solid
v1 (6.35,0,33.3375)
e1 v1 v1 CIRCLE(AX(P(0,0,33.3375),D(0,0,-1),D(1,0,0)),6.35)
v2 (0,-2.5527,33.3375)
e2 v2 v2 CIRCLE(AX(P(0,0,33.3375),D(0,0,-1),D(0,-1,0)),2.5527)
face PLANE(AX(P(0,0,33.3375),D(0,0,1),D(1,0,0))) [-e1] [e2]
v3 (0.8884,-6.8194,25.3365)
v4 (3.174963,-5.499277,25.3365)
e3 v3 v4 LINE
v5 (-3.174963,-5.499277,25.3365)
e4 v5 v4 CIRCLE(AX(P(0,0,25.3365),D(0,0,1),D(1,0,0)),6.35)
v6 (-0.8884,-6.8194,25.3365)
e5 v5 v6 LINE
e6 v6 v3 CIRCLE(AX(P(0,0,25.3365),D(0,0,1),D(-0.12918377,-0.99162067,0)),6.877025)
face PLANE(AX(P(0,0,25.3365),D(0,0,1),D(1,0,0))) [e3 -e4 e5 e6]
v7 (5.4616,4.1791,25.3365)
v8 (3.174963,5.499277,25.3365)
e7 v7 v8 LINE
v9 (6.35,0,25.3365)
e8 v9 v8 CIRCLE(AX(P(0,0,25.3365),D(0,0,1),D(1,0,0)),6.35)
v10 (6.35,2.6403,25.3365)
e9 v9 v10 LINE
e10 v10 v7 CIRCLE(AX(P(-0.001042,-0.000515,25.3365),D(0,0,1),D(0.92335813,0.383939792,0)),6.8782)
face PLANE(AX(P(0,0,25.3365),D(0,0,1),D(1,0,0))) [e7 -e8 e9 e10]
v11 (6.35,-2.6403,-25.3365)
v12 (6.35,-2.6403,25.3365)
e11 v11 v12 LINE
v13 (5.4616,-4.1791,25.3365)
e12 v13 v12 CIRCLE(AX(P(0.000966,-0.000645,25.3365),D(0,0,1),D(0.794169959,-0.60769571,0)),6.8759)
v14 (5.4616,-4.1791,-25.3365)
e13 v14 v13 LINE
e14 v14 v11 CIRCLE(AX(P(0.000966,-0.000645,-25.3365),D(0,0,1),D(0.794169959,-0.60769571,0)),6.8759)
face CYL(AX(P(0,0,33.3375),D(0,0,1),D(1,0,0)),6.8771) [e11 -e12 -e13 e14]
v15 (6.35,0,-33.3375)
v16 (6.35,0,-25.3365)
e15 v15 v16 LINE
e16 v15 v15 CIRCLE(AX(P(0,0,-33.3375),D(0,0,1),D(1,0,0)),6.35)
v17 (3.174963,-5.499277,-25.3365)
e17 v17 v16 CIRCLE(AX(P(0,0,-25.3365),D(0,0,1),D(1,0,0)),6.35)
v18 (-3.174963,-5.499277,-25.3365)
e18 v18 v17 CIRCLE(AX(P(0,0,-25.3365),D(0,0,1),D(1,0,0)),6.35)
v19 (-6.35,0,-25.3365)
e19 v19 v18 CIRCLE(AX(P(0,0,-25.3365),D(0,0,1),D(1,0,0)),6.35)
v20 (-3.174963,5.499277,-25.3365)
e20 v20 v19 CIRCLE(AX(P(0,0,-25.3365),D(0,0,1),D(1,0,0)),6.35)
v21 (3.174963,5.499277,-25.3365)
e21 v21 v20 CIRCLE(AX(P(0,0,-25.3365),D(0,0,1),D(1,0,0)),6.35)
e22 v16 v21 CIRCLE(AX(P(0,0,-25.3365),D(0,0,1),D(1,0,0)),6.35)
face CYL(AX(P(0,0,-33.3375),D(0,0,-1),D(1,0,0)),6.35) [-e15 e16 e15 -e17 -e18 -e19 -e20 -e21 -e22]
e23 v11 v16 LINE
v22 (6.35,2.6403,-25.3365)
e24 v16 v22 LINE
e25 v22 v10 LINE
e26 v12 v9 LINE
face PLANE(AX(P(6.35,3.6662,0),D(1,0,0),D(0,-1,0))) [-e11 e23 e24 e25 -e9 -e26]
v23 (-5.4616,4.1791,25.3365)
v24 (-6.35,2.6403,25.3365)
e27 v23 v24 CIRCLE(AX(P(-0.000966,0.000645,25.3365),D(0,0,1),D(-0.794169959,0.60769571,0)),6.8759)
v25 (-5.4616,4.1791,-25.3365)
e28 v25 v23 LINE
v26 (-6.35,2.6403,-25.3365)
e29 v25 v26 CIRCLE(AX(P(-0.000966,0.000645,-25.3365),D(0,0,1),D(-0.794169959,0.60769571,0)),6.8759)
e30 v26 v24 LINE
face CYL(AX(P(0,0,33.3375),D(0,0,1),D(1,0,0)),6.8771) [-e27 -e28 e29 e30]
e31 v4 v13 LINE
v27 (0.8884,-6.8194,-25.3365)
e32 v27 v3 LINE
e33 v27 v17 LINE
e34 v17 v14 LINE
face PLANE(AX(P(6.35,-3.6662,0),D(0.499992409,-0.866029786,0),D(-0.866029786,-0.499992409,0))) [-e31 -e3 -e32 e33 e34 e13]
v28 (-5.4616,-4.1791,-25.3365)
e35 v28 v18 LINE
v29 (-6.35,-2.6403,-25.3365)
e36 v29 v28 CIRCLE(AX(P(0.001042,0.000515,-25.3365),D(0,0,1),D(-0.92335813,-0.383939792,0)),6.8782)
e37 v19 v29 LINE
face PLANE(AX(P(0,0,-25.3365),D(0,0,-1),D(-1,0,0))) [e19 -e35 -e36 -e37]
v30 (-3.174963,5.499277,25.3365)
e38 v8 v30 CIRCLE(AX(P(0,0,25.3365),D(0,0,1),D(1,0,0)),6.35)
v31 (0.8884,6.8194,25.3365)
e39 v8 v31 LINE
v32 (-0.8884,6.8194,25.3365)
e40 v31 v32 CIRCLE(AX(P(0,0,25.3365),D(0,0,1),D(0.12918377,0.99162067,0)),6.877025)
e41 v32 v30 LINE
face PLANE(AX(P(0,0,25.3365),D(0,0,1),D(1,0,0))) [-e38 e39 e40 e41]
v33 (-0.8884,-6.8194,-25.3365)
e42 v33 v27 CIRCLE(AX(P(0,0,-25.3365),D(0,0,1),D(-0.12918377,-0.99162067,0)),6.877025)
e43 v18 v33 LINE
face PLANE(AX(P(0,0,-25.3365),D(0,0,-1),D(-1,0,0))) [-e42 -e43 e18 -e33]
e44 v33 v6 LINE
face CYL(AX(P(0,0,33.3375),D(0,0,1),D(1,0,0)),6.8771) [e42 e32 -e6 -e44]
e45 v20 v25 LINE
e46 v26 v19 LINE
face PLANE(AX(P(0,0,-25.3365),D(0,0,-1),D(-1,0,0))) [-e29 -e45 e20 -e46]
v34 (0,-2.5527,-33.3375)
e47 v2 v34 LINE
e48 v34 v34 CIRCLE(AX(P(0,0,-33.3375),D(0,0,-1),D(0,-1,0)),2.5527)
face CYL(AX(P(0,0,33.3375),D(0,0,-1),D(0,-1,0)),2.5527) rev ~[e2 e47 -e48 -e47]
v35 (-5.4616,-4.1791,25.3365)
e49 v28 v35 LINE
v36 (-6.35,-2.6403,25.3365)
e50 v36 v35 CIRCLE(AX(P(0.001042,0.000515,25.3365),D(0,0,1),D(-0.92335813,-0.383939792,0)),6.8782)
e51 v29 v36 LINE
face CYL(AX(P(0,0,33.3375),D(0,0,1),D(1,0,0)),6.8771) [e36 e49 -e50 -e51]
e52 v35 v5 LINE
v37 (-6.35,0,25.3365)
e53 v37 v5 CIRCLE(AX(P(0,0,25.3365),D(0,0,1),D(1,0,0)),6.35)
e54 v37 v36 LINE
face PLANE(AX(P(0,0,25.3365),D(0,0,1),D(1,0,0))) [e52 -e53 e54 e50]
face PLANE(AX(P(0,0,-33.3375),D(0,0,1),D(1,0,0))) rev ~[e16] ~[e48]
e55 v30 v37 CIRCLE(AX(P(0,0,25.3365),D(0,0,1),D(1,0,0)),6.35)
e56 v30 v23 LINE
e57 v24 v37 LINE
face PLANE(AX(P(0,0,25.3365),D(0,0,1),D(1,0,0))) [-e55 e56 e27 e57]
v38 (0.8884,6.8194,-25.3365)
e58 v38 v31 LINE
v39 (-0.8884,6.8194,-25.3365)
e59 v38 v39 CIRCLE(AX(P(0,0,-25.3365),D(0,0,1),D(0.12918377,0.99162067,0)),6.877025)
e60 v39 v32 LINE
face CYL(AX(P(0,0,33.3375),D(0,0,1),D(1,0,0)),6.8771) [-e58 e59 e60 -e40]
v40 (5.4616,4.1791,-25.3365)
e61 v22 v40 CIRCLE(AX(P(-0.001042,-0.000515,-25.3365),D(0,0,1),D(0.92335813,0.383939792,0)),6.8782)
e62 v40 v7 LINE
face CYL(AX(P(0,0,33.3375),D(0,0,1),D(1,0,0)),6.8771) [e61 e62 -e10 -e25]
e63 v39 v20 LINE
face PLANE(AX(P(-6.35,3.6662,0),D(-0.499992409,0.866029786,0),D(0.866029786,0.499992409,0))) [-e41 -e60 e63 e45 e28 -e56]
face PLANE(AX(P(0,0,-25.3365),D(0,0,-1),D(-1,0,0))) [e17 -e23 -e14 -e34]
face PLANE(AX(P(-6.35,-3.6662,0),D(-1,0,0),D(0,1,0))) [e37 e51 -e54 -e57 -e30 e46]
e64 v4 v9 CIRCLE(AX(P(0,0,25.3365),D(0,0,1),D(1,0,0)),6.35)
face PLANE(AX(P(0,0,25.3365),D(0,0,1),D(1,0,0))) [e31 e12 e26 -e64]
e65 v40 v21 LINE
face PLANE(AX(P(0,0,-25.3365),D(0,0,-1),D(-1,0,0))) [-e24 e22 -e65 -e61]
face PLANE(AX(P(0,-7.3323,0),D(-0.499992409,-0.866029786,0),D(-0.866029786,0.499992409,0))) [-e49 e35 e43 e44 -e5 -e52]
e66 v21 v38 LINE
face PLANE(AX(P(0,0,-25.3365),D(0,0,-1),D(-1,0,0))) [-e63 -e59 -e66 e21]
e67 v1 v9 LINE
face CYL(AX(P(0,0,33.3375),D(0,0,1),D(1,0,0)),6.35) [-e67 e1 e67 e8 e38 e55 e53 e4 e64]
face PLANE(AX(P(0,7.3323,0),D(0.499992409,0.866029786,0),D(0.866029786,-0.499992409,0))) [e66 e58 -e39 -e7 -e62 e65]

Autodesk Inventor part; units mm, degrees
ref_plane "YZ Plane" through (0, 0, 0) normal (1, 0, 0) x (0, 1, 0)
ref_plane "XZ Plane" through (0, 0, 0) normal (0, 1, 0) x (-1, 0, 0)
ref_plane "XY Plane" through (0, 0, 0) normal (0, 0, 1) x (1, 0, 0)
sketch "Sketch1" plane through (0, 0, 0) normal (0, 0, 1) x (1, 0, 0)
  line L0 (-6.35, -3.6662) -> (-6.35, 3.6662)
  line L1 (-6.35, 3.6662) -> (0, 7.3323)
  line L2 (0, 7.3323) -> (6.35, 3.6662)
  line L3 (6.35, 3.6662) -> (6.35, -3.6662)
  line L4 (6.35, -3.6662) -> (0, -7.3323)
  line L5 (0, -7.3323) -> (-6.35, -3.6662)
  point P0 (0, 0)
  point P1 (0, 0)
  dimension "Size" = 12.7
extrude "Extrusion1" add sketch "Sketch1" along normal mid plane 66.675
sketch "Sketch3" plane through (0, 0, 33.3375) normal (0, 0, 1) x (1, 0, 0)
  line L0 (-6.35, 3.6662) -> (0, 7.3323) construction
  line L1 (0, 7.3323) -> (6.35, 3.6662) construction
  line L2 (6.35, 3.6662) -> (6.35, -3.6662) construction
  line L3 (6.35, -3.6662) -> (0, -7.3323) construction
  line L4 (0, -7.3323) -> (-6.35, -3.6662) construction
  line L5 (-6.35, -3.6662) -> (-6.35, 3.6662) construction
  point P0 (0, 0)
hole "Hole1" at (0, 0, 33.3375) direction (0, 0, -1) diameter 5.1054 end through all
sketch "Sketch4" plane through (0, 0, 33.3375) normal (0, 0, 1) x (1, 0, 0)
  circle A0 centre (0, 0) radius 2.5527 construction
  line L0 (-6.35, 3.6662) -> (0, 7.3323) construction
  line L1 (0, 7.3323) -> (6.35, 3.6662) construction
  line L2 (6.35, 3.6662) -> (6.35, -3.6662) construction
  line L3 (6.35, -3.6662) -> (0, -7.3323) construction
  line L4 (0, -7.3323) -> (-6.35, -3.6662) construction
  line L5 (-6.35, -3.6662) -> (-6.35, 3.6662) construction
  circle A1 centre (0, 0) radius 6.8771
  circle A2 centre (0, 0) radius 8.89
  dimension "thunder" = 13.7541
  dimension "d16" = 17.78
extrude "Extrusion3" cut sketch "Sketch4" against normal through all
sketch "Sketch5" plane through (0, 0, 33.3375) normal (0, 0, 1) x (1, 0, 0)
  arc A0 (5.4616, -4.1791) -> (6.35, -2.6403) centre (0, 0) ccw projected
  line L0 (6.35, -2.6403) -> (6.35, 2.6403) projected
  arc A1 (6.35, 2.6403) -> (5.4616, 4.1791) centre (0, 0) ccw projected
  line L1 (5.4616, 4.1791) -> (0.8884, 6.8194) projected
  arc A2 (0.8884, 6.8194) -> (-0.8884, 6.8194) centre (0, 0) ccw projected
  line L2 (-0.8884, 6.8194) -> (-5.4616, 4.1791) projected
  arc A3 (-5.4616, 4.1791) -> (-6.35, 2.6403) centre (0, 0) ccw projected
  line L3 (-6.35, 2.6403) -> (-6.35, -2.6403) projected
  arc A4 (-6.35, -2.6403) -> (-5.4616, -4.1791) centre (0, 0) ccw projected
  line L4 (-5.4616, -4.1791) -> (-0.8884, -6.8194) projected
  arc A5 (-0.8884, -6.8194) -> (0.8884, -6.8194) centre (0, 0) ccw projected
  line L5 (0.8884, -6.8194) -> (5.4616, -4.1791) projected
  circle A6 centre (0, 0) radius 2.5527 projected
  circle A7 centre (0, 0) radius 6.35
  point P0 (3.175, -5.4993)
  point P1 (-3.175, -5.4993)
  point P2 (-6.35, 0)
  point P3 (-3.175, 5.4993)
  point P4 (3.175, 5.4993)
  point P5 (6.35, 0)
  dimension "d19" = 12.7
extrude "Extrusion4" cut sketch "Sketch5" against normal blind 8.001 contours L5 A7 L0 A0 | L5 A5 L4 A7 | A7 L1 A1 L0 | L4 A4 L3 A7 | A7 L2 A2 L1 | L3 A3 L2 A7
mirror "Mirror2" about plane through (0, 0, 0) normal (0, 0, 1) of "Extrusion4"
equation "\"bearing\" = 25.4"
properties part number "GP6-009" material "Aluminum 6061"
